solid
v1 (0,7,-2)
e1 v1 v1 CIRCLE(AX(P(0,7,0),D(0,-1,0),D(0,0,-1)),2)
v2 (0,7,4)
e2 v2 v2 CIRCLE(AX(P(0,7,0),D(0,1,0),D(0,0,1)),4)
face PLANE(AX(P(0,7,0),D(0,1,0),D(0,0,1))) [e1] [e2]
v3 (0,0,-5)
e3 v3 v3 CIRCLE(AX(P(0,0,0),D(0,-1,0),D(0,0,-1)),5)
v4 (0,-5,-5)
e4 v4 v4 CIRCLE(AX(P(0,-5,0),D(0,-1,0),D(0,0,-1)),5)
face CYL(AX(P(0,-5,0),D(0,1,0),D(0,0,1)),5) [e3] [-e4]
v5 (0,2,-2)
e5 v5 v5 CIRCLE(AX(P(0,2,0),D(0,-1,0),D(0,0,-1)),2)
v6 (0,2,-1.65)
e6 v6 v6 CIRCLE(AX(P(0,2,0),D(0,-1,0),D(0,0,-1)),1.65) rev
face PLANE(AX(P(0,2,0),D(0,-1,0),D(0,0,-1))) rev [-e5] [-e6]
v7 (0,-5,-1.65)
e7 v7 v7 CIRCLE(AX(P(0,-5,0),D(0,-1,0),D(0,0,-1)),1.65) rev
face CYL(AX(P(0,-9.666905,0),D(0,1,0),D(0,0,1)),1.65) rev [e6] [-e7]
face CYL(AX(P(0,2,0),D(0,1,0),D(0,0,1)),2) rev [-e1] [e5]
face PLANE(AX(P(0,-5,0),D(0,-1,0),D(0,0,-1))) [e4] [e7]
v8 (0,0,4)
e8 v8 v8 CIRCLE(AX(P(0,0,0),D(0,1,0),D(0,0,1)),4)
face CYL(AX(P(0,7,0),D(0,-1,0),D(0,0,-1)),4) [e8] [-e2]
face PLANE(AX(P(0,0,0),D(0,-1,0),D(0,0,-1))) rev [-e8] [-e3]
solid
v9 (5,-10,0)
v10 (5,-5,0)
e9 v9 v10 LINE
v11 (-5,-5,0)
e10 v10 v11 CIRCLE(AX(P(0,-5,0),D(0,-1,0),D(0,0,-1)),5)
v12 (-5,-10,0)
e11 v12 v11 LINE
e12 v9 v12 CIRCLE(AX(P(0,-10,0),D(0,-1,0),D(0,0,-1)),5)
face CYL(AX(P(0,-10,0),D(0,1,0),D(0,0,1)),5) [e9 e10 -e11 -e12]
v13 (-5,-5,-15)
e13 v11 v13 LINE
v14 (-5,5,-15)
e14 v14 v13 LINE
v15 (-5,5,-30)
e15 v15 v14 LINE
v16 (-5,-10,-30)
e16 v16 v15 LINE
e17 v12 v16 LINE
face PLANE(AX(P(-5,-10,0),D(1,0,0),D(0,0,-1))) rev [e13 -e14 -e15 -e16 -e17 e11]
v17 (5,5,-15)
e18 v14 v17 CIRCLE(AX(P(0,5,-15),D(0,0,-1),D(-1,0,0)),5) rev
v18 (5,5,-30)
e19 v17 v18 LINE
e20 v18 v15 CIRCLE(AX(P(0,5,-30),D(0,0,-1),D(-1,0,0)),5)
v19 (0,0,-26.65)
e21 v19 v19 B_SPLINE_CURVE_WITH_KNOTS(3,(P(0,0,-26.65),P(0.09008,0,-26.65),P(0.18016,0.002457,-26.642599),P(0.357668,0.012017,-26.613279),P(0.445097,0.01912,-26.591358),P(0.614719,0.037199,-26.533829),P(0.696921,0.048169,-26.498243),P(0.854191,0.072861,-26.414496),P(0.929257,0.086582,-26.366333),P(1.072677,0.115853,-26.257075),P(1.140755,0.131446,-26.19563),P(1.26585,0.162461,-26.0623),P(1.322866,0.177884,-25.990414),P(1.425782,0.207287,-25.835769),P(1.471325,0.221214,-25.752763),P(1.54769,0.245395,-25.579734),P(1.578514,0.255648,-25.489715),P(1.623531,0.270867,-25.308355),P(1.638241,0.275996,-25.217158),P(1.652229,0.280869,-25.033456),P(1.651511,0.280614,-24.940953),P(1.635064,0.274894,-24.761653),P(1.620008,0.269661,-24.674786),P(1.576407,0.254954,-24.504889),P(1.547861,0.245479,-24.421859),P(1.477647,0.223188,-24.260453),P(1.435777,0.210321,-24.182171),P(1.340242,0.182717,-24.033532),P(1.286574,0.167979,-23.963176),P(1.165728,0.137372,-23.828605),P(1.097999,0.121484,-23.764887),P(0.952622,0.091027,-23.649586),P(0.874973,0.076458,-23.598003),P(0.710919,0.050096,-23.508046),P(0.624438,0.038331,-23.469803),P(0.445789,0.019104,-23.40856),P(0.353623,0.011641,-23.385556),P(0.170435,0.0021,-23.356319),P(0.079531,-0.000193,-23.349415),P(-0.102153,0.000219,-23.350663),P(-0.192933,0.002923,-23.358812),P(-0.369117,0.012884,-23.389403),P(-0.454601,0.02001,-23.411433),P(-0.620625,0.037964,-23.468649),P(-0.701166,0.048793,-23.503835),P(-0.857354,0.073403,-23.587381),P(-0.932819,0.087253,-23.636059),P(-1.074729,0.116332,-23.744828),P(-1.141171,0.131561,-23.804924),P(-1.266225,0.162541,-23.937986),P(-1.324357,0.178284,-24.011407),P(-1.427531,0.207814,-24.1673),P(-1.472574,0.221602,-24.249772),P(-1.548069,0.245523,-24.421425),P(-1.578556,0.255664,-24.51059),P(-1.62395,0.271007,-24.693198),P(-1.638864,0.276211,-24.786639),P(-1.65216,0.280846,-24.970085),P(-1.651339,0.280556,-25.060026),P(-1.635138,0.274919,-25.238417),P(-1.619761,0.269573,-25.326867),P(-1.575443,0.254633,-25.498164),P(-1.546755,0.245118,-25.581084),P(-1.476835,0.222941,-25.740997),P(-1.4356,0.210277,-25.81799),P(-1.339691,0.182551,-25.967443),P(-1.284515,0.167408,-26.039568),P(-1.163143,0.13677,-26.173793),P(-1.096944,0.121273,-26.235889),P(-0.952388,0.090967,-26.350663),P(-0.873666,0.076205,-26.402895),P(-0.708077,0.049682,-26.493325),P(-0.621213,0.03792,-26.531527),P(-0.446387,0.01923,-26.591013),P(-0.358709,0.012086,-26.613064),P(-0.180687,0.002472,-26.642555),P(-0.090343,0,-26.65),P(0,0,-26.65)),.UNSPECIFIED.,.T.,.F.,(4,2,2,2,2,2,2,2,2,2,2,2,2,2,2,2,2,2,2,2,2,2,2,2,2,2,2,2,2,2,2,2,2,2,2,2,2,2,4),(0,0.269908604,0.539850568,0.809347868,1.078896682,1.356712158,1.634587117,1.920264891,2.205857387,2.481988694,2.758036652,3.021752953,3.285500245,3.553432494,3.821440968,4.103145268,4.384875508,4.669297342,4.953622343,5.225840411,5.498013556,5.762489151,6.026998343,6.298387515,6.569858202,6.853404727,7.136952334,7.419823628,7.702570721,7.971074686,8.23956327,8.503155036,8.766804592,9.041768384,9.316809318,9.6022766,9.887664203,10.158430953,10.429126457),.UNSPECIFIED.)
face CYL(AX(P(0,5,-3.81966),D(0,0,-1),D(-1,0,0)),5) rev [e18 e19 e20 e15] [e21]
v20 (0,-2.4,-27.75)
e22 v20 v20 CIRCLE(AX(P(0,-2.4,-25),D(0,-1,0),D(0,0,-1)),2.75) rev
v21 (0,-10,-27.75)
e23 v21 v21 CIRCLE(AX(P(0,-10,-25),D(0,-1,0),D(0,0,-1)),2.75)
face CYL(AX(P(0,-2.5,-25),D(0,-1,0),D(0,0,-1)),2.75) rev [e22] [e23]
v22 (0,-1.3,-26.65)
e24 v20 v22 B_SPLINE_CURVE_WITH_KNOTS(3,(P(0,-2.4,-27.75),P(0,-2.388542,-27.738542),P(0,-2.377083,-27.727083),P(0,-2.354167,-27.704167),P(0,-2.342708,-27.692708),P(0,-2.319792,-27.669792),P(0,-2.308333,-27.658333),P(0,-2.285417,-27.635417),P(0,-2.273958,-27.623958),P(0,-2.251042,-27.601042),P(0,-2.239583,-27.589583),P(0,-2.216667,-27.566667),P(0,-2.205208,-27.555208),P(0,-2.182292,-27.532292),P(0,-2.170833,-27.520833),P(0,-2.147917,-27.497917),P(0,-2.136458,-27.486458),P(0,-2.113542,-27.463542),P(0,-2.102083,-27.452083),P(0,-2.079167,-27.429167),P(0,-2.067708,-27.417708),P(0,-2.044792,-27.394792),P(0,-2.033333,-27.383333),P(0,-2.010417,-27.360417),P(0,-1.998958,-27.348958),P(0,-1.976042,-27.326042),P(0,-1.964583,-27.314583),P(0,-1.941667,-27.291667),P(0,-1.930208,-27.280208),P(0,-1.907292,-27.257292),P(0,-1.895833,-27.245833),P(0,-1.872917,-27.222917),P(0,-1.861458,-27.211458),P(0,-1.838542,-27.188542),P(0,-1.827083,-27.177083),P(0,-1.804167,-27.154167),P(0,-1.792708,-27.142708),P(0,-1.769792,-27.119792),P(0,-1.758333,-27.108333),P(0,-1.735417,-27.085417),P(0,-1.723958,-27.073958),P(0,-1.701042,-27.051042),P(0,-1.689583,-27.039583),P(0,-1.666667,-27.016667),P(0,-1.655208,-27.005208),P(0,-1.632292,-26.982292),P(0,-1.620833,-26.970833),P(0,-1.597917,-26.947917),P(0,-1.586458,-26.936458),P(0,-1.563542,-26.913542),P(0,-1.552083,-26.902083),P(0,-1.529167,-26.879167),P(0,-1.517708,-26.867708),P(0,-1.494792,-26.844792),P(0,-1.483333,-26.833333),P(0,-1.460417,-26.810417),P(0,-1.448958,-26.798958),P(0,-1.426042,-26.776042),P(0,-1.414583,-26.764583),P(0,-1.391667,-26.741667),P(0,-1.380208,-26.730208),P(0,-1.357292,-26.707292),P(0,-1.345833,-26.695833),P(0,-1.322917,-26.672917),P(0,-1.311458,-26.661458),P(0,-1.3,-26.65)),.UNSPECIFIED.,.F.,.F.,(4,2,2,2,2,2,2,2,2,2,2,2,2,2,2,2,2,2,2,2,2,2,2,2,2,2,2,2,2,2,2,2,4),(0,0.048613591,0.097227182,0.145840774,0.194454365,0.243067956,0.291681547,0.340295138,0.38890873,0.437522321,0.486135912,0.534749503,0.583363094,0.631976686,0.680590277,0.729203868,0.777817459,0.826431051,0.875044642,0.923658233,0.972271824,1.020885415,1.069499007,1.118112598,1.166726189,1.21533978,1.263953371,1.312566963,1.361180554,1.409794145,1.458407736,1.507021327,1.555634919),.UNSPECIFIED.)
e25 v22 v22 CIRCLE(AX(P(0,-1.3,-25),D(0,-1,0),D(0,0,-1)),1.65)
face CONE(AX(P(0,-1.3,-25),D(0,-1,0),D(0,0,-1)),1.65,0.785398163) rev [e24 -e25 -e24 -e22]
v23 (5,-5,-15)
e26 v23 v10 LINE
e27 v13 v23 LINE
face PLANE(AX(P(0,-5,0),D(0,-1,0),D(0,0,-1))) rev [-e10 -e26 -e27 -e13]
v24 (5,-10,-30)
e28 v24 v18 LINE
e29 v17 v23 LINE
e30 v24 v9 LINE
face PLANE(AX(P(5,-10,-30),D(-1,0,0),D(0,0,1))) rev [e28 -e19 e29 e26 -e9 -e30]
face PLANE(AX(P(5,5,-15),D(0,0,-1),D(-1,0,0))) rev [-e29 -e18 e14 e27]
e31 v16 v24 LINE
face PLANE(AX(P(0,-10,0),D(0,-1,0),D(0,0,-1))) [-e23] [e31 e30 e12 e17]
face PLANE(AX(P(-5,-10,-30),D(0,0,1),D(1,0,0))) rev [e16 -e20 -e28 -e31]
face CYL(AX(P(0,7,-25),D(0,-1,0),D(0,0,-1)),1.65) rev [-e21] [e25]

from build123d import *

# Parameters (mm, degrees)
SKETCH2_R           = 4
BOSS_EXTRUDE1_DEPTH = 7
SKETCH3_R           = 5
BOSS_EXTRUDE2_DEPTH = 5
SKETCH4_R           = 1.65
CUT_EXTRUDE1_DEPTH  = 12
SKETCH5_R           = 2
CUT_EXTRUDE2_DEPTH  = 5
BOSS_EXTRUDE3_DEPTH = 5
SKETCH8_W           = 10
SKETCH8_H           = 15
BOSS_EXTRUDE4_DEPTH = 10
CUT_EXTRUDE3_DEPTH  = 15
SKETCH10_R          = 2.75
CUT_EXTRUDE4_DEPTH  = 7.5
SKETCH11_R          = 1.65
CUT_EXTRUDE5_DEPTH  = 32.862987933
CHAMFER2_SIZE       = 1.2


with BuildPart() as part:
    # Sketch2 → Boss-Extrude1 (new body)
    with BuildSketch(Plane(origin=(0, 0, 0), x_dir=(1, 0, 0), z_dir=(0, 1, 0))):
        with Locations(Location((0, 0, 0), (0, 0, 270))):
            Circle(SKETCH2_R)
    extrude(amount=BOSS_EXTRUDE1_DEPTH)

    # Sketch3 → Boss-Extrude2 (add)
    with BuildSketch(Plane.XZ):
        with Locations(Location((0, 0, 0), (0, 0, 270))):
            Circle(SKETCH3_R)
    extrude(amount=BOSS_EXTRUDE2_DEPTH)

    # Sketch4 → Cut-Extrude1 (cut)
    with BuildSketch(Plane(origin=(0, 7, 0), x_dir=(1, 0, 0), z_dir=(0, 1, 0))):
        with Locations(Location((0, 0, 0), (0, 0, 270))):
            Circle(SKETCH4_R)
    extrude(amount=-CUT_EXTRUDE1_DEPTH, mode=Mode.SUBTRACT)

    # Sketch5 → Cut-Extrude2 (cut)
    with BuildSketch(Plane.XZ.offset(-7)):
        with Locations(Location((0, 0, 0), (0, 0, 270))):
            Circle(SKETCH5_R)
    extrude(amount=CUT_EXTRUDE2_DEPTH, mode=Mode.SUBTRACT)


with BuildPart() as body_2:
    # Sketch7 → Boss-Extrude3 (new body)
    with BuildSketch(Plane.XZ.offset(5)):
        with BuildLine():
            Line((-5, 0), (-5, -30))
            Line((-5, -30), (5, -30))
            Line((5, -30), (5, 0))
            ThreePointArc((5, 0), (0, 5), (-5, 0))
        make_face()
    extrude(amount=BOSS_EXTRUDE3_DEPTH)

    # Sketch8 → Boss-Extrude4 (add)
    with BuildSketch(Plane(origin=(0, -5, 0), x_dir=(1, 0, 0), z_dir=(0, 1, 0))):
        with Locations((0, 22.5)):
            Rectangle(SKETCH8_W, SKETCH8_H)
    extrude(amount=BOSS_EXTRUDE4_DEPTH)

    # Sketch9 → Cut-Extrude3 (cut)
    with BuildSketch(Plane(origin=(0, 0, -30), x_dir=(-1, 0, 0), z_dir=(0, 0, -1))):
        with BuildLine():
            Line((-5, 5), (5, 5))
            ThreePointArc((5, 5), (0, 0), (-5, 5))
        make_face()
    extrude(amount=-CUT_EXTRUDE3_DEPTH, mode=Mode.SUBTRACT)

    # Sketch10 → Cut-Extrude4 (cut)
    with BuildSketch(Plane.XZ.offset(10)):
        with Locations(Location((0, -25, 0), (0, 0, 270))):
            Circle(SKETCH10_R)
    extrude(amount=-CUT_EXTRUDE4_DEPTH, mode=Mode.SUBTRACT)

    # Sketch11 → Cut-Extrude5 (cut, through all)
    with BuildSketch(Plane.XZ.offset(2.5)):
        with Locations(Location((0, -25, 0), (0, 0, 270))):
            Circle(SKETCH11_R)
    extrude(amount=-CUT_EXTRUDE5_DEPTH, mode=Mode.SUBTRACT)

    # Chamfer2
    # the kernel refuses this chamfer: 1.2 mm, written as the material it takes off along each edge
    with BuildSketch(Plane(origin=(0, -2.5, -25), x_dir=(0, 0, -1), z_dir=(-1, 0, 0))) as chamfer2_piece_1_section:
        Polygon((1.65, -CHAMFER2_SIZE), (1.65 + CHAMFER2_SIZE, 0), (1.65, 0), align=None)
    chamfer2_piece_1 = revolve(axis=Axis((0, -2.5, -25), (0, -1, 0)), mode=Mode.PRIVATE)
    chamfer2_piece_1 = chamfer2_piece_1 & Plane(origin=(0, -1.848254626, -25), x_dir=(0, 0, -1), z_dir=(0, -1, 0)) * Cylinder(2.75, 12, mode=Mode.PRIVATE)
    add(chamfer2_piece_1, mode=Mode.SUBTRACT)


solid = Compound([part.part, body_2.part])
